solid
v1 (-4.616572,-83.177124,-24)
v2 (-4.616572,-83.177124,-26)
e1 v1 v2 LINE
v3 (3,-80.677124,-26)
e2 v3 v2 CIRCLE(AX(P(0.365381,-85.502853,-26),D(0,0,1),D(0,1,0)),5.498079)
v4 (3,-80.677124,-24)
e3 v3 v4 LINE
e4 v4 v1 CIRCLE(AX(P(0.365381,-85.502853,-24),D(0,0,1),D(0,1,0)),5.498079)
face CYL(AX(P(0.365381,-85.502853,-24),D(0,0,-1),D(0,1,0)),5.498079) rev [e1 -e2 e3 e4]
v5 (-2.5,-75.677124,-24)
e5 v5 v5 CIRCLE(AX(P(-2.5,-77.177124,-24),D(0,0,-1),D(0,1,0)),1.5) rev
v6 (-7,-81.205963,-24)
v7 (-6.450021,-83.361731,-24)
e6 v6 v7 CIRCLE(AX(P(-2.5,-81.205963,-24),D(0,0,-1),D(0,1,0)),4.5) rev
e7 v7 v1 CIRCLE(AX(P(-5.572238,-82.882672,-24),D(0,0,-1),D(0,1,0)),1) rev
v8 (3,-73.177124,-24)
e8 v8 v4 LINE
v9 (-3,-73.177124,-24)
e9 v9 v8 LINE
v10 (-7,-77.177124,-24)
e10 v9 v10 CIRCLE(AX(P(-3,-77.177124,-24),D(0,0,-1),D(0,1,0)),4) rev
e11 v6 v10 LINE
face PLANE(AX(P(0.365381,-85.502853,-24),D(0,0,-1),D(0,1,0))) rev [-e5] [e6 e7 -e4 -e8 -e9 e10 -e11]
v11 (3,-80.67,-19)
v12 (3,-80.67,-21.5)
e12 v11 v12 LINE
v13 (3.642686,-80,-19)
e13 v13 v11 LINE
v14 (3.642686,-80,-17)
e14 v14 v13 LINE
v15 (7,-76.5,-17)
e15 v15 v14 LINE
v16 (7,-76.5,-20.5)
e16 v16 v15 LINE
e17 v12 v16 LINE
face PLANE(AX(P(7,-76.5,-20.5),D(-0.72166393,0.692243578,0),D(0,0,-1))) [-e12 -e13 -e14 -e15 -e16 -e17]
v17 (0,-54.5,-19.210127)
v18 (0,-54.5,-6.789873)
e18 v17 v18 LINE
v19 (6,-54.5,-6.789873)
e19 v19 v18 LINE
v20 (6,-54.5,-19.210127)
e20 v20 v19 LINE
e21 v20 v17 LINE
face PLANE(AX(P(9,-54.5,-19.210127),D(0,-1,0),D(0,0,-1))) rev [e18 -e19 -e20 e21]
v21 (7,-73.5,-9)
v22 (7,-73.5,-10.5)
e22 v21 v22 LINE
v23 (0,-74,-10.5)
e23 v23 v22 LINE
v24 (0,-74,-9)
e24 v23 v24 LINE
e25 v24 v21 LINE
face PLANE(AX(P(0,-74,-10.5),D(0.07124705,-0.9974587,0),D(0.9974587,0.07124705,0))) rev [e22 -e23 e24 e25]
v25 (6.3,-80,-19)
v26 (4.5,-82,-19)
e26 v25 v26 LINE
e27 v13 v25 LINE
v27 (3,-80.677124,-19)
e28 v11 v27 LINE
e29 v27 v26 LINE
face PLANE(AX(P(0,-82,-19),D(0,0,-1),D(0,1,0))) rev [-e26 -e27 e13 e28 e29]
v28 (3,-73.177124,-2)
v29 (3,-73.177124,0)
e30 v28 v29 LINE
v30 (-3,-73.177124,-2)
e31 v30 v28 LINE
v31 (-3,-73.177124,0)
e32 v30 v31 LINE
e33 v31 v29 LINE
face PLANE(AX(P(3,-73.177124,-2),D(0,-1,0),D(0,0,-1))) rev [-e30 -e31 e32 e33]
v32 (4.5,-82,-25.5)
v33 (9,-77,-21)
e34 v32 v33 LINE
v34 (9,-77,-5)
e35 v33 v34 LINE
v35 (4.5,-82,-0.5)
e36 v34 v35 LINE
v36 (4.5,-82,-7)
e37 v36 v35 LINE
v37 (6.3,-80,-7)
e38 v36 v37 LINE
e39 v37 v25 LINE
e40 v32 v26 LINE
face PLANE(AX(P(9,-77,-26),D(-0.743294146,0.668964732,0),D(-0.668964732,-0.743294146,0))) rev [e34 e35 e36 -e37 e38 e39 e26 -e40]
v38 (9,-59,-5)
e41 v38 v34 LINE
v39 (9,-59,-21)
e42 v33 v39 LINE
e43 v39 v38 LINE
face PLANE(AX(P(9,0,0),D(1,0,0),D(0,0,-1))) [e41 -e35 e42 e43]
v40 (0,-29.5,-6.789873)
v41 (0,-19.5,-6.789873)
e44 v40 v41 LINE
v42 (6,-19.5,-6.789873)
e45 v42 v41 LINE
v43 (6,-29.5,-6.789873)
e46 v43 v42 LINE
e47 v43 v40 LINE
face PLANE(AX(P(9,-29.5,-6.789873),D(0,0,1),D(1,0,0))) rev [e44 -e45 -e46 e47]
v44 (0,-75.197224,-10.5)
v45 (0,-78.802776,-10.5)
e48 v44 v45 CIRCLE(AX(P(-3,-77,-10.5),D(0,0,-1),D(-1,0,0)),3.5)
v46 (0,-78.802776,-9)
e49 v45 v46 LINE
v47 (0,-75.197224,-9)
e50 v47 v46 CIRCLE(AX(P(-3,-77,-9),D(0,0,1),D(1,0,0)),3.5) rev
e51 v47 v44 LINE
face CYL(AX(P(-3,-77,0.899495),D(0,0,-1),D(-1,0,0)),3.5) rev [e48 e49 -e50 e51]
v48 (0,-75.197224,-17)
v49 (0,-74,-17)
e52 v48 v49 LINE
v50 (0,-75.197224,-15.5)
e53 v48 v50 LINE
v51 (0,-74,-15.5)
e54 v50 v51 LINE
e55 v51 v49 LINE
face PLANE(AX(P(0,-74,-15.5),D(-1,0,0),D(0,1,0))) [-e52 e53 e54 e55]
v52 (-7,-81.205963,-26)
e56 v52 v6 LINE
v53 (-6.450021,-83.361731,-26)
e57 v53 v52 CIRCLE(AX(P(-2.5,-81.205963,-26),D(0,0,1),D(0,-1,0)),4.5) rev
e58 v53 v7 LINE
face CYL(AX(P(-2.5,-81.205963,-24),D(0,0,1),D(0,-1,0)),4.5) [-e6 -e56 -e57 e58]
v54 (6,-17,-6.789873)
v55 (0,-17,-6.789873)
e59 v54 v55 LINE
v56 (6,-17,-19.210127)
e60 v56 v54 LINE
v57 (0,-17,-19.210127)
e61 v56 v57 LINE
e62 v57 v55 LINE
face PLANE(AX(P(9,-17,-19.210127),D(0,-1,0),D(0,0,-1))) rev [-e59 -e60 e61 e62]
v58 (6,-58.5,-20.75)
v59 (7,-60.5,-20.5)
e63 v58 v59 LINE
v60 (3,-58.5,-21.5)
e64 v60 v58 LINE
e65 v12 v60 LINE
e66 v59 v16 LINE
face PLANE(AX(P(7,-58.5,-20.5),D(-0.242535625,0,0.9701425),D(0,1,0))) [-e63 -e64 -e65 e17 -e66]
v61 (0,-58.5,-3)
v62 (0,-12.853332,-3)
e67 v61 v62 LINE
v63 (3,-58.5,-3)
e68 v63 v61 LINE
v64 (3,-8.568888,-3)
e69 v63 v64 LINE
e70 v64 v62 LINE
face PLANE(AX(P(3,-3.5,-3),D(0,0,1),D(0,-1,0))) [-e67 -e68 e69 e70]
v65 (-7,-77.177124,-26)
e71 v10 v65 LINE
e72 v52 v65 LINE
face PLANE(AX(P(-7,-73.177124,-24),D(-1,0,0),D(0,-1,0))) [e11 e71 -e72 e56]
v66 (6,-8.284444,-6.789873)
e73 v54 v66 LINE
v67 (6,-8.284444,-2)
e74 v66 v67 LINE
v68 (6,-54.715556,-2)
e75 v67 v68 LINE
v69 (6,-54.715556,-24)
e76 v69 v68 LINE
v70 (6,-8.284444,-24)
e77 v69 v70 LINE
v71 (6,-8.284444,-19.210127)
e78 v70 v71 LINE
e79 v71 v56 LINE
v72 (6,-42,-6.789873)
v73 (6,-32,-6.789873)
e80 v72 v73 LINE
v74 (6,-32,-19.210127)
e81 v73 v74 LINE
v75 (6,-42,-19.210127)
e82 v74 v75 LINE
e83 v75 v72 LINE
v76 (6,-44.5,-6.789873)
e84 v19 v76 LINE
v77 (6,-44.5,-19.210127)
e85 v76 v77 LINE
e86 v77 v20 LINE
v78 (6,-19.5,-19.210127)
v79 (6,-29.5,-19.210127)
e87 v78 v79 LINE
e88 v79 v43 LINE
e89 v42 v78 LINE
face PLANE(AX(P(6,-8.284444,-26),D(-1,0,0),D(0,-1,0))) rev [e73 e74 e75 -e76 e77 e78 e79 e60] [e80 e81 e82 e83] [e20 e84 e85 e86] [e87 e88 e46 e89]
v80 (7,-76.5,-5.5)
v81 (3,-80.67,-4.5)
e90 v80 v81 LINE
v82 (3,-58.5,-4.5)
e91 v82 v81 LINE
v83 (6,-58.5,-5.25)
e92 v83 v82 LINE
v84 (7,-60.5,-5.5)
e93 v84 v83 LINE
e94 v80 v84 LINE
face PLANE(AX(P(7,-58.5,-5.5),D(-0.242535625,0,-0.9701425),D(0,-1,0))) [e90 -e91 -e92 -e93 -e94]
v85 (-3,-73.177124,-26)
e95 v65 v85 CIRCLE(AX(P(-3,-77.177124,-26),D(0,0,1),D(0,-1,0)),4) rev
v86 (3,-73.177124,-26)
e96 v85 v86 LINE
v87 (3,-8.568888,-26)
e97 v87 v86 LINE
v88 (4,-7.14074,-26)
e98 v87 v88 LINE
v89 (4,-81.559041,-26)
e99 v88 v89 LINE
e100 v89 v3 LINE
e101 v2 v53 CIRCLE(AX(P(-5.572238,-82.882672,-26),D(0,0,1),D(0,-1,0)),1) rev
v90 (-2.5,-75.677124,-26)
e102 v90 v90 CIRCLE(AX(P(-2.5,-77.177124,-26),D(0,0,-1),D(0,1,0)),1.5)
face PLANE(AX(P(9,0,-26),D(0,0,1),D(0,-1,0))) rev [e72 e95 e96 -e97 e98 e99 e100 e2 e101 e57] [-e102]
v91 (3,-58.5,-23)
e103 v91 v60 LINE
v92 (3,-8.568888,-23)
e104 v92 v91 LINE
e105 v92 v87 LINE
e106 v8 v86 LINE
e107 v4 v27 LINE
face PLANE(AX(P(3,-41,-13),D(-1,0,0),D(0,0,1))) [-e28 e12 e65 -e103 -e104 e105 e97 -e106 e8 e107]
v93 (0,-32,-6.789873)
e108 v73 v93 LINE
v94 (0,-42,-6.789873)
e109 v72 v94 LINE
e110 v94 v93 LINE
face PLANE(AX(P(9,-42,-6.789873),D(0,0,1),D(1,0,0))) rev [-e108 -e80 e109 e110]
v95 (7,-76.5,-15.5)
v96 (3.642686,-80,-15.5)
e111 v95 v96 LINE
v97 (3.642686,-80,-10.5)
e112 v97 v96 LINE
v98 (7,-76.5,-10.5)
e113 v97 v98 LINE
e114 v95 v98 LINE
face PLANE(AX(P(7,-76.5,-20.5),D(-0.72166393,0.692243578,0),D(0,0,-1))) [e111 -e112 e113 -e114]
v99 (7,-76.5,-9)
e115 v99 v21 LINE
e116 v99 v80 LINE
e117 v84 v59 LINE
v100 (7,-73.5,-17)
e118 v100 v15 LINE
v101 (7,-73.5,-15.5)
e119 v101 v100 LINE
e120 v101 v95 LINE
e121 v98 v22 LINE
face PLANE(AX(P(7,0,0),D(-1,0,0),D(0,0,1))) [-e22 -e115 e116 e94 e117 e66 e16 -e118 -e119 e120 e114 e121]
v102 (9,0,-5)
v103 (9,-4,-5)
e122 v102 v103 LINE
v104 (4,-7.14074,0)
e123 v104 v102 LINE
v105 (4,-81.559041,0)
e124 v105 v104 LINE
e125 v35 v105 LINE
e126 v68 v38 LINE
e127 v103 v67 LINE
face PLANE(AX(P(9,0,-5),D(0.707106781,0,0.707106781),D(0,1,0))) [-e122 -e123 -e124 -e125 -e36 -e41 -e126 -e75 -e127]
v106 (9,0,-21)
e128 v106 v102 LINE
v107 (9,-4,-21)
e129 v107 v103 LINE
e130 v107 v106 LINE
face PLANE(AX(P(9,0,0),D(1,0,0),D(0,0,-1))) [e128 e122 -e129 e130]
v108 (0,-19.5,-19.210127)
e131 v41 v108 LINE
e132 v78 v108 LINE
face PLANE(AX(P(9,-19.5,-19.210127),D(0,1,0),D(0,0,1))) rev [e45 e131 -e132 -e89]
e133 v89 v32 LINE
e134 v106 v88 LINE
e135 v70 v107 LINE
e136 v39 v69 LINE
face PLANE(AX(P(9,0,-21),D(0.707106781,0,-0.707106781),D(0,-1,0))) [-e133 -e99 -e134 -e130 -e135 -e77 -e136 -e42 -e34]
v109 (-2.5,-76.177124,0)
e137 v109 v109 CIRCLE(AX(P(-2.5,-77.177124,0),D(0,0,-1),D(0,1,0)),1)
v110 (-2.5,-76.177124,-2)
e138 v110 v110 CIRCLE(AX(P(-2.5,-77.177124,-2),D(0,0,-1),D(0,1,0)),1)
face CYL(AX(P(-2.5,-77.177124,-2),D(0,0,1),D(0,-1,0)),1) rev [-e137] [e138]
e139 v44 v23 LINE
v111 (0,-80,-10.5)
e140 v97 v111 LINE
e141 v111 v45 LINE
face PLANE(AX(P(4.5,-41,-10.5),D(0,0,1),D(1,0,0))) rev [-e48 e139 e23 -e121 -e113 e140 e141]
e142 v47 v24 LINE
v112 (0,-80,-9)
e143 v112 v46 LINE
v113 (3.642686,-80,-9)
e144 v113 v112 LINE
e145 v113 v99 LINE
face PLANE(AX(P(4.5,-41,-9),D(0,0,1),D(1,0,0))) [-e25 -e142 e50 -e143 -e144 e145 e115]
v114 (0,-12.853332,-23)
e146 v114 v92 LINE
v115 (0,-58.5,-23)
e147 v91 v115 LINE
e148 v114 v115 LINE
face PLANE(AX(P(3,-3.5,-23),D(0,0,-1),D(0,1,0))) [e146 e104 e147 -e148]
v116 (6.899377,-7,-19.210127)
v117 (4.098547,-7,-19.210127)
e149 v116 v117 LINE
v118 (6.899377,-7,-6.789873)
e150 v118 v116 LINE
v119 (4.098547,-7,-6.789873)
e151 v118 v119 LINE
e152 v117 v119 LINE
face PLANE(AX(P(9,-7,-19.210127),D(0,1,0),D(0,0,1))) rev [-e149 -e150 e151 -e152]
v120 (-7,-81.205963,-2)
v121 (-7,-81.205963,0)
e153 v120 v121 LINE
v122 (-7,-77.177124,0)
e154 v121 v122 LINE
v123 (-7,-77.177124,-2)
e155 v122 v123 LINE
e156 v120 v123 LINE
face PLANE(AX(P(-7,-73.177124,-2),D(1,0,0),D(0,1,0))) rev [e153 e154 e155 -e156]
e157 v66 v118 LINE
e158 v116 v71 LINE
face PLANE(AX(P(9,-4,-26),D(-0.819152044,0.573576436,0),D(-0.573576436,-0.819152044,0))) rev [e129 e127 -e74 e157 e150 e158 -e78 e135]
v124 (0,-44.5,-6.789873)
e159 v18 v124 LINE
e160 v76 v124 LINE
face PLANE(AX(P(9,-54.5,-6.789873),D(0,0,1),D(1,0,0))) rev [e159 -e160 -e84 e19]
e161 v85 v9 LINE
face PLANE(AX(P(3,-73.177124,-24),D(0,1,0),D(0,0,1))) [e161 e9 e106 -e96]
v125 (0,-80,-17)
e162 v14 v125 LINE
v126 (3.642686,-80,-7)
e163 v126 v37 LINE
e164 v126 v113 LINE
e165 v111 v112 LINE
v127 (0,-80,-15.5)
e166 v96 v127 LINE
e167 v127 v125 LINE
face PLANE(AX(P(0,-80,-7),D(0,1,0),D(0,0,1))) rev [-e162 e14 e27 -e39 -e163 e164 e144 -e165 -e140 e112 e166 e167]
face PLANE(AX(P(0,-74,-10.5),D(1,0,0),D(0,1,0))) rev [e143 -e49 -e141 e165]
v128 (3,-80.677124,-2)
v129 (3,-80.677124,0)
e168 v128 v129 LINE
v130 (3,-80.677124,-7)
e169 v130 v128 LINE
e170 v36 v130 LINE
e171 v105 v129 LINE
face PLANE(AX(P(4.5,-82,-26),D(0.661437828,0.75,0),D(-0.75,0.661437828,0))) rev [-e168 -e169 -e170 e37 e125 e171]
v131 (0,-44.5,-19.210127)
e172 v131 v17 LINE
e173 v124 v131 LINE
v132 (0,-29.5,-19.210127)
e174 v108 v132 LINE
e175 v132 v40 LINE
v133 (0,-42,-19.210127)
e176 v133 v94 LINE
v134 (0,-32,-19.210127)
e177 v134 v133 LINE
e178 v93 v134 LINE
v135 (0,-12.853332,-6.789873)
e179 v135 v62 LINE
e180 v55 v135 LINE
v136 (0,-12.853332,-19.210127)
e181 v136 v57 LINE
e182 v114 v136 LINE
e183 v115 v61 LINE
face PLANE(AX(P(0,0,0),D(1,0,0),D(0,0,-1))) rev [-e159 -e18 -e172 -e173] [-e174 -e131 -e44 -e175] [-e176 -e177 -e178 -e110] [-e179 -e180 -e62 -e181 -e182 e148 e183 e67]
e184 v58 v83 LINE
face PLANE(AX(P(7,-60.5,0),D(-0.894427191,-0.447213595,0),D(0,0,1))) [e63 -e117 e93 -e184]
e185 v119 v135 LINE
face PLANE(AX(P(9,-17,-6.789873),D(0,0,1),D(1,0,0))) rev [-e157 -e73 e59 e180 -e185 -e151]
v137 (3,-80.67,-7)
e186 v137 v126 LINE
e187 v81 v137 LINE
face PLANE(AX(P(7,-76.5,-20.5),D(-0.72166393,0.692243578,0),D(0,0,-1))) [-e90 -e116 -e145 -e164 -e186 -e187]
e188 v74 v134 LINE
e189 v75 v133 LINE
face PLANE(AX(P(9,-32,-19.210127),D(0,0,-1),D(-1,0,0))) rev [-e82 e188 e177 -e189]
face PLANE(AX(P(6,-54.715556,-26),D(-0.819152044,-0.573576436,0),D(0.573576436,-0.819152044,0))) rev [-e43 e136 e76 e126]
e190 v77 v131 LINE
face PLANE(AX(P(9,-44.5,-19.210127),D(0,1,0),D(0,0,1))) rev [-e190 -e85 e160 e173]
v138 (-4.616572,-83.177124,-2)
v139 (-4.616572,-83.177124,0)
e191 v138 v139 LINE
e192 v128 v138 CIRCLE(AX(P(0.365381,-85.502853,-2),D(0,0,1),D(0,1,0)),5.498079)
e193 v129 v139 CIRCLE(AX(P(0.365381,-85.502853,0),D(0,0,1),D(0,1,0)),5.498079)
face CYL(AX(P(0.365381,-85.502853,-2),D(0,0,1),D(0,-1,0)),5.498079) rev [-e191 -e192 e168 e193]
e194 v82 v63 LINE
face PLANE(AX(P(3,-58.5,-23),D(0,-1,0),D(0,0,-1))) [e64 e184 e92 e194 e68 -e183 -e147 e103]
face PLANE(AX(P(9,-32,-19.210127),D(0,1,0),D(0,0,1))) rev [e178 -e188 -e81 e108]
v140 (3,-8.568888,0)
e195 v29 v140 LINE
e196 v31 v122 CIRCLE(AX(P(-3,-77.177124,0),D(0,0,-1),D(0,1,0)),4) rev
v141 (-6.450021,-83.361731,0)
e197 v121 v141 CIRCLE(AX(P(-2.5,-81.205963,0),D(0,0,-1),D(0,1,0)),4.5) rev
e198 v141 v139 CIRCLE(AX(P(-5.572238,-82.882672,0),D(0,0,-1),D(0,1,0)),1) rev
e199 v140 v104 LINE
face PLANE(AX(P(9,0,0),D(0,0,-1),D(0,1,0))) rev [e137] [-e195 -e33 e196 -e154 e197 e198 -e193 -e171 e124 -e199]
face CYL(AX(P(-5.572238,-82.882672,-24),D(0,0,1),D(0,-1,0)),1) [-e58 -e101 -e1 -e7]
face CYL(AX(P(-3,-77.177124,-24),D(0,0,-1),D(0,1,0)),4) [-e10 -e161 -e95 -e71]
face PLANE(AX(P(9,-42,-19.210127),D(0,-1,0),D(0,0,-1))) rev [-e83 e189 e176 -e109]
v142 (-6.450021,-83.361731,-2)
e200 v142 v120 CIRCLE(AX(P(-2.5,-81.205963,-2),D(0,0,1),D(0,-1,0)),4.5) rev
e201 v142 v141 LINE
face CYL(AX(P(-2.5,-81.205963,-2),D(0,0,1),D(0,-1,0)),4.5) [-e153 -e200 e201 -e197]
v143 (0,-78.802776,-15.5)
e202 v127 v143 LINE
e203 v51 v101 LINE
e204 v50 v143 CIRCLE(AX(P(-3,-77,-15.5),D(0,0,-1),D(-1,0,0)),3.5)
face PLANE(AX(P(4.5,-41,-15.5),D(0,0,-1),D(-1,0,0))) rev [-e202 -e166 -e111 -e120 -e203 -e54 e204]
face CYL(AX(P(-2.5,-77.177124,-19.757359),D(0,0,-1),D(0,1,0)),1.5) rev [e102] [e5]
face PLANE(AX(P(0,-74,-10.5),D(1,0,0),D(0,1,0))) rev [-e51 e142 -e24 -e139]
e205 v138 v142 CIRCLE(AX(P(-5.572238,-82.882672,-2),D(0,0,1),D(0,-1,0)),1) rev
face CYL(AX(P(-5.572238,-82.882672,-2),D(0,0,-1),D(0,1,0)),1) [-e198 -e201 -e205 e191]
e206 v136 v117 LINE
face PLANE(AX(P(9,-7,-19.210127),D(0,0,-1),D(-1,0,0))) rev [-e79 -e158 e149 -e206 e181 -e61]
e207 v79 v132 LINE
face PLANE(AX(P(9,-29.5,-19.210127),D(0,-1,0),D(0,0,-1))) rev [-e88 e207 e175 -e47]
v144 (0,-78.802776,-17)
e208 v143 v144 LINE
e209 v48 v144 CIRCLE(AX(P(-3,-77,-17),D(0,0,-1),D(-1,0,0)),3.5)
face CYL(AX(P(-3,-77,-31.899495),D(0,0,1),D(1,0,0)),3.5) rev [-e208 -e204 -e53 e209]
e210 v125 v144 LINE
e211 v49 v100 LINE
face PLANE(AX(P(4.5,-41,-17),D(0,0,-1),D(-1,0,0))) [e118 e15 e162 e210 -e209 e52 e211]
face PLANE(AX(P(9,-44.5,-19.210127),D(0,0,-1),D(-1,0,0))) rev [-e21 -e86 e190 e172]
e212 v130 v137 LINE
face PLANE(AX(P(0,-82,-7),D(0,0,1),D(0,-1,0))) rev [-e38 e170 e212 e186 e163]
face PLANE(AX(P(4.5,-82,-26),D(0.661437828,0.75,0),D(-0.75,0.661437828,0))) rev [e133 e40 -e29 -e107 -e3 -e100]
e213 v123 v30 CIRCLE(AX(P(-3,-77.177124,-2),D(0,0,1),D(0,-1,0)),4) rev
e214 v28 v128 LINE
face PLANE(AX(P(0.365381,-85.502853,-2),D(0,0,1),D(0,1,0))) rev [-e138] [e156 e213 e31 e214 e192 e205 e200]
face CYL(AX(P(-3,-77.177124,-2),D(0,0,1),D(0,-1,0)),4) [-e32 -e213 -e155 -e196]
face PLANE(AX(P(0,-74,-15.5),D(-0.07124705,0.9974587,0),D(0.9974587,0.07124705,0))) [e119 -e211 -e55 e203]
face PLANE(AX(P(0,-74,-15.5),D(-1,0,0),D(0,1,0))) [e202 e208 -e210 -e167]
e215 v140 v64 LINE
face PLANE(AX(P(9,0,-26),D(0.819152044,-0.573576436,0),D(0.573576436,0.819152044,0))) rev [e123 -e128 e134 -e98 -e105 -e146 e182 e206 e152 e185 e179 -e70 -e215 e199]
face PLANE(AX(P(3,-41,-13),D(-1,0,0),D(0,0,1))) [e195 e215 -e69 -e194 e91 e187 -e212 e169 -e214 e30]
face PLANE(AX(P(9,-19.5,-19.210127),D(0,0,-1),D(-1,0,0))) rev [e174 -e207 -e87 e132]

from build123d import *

# Parameters (mm, degrees)
SKETCH_1_W             = 26
SKETCH_1_H             = 82
EXTRUDE_1_DEPTH        = 9
CHAMFER_1_SIZE         = 5
CUT_EXTRUDE_1_DEPTH    = 87.492774265
SKETCH_3_OUTSIDE_W     = 45.298
SKETCH_3_OUTSIDE_H     = 101.298
SKETCH_3_OUTSIDE_W_2   = 20
SKETCH_3_OUTSIDE_H_2   = 55
CUT_EXTRUDE_2_DEPTH    = 3
SKETCH_4_W             = 12.420254628
SKETCH_4_H             = 10
CUT_EXTRUDE_3_DEPTH    = 87.492774265
PATTERN_LINEAR_1_COUNT = 4
PATTERN_LINEAR_1_PITCH = 12.5
CUT_EXTRUDE_4_DEPTH    = 87.492774265
SKETCH_6_W             = 12
SKETCH_6_H             = 2
CUT_EXTRUDE_5_DEPTH    = 87.492774265
SKETCH_7_W             = 15
SKETCH_7_H             = 18
CUT_EXTRUDE_6_DEPTH    = 4
CUT_EXTRUDE_7_DEPTH    = 87.492774265
CHAMFER_2_SIZE         = 1
CHAMFER_2_SIZE2        = 2
CHAMFER_3_SIZE2        = 1
CHAMFER_3_SIZE         = 4
CHAMFER_4_SIZE2        = 4
CHAMFER_4_SIZE         = 1
CHAMFER_5_SIZE         = 4.17
CHAMFER_5_SIZE_2       = 4
RIB_1_DEPTH            = 1.5
SKETCH_10_R            = 3.5
CUT_EXTRUDE_8_DEPTH    = 1.5
EXTRUDE_2_DEPTH        = 2
FILLET_1_R             = 4
FILLET_2_R             = 4.5
SKETCH_12_R            = 1
CUT_EXTRUDE_9_DEPTH    = 2
FILLET_1_OF_MIRROR_2_R = 4
FILLET_2_OF_MIRROR_2_R = 4.5
FILLET_3_R             = 1
SKETCH_13_R            = 1.5
CUT_EXTRUDE_11_DEPTH   = 2


# Read off the part's stored shape, not the designer's step: 筋1
# Some blends are built 0.0001 mm under size
with BuildPart() as part:
    # 草图1 → 凸台-拉伸1 (new body)
    with BuildSketch(Plane(origin=(0, 0, 0), x_dir=(0, 0, -1), z_dir=(1, 0, 0))):
        with Locations((13, -41)):
            Rectangle(SKETCH_1_W, SKETCH_1_H)
    extrude(amount=EXTRUDE_1_DEPTH)

    # 倒角1
    chamfer_1_edges = [part.edges().sort_by_distance(p)[0] for p in [
        (9, -41, -26),
        (9, -41, 0),
    ]]
    chamfer(chamfer_1_edges, length=CHAMFER_1_SIZE)

    # 草图2 → 切除-拉伸1 (cut, through all)
    with BuildSketch(Plane.XY):
        Polygon((9, 0), (0, -12.853332061), (0, 0), align=None)
        Polygon((9, -4), (6, -8.28444402), (6, -54.71555598), (9, -59), align=None)
    extrude(amount=-CUT_EXTRUDE_1_DEPTH, mode=Mode.SUBTRACT)

    # 草图3 outside → 切除-拉伸2 (cut)
    with BuildSketch(Plane.ZY):
        with Locations((-13, -41)):
            Rectangle(SKETCH_3_OUTSIDE_W, SKETCH_3_OUTSIDE_H)
        with Locations((-13, -31)):
            Rectangle(SKETCH_3_OUTSIDE_W_2, SKETCH_3_OUTSIDE_H_2, mode=Mode.SUBTRACT)
    extrude(amount=-CUT_EXTRUDE_2_DEPTH, mode=Mode.SUBTRACT)

    # 草图4 → 切除-拉伸3 (cut, through all)
    with BuildSketch(Plane.ZY):
        with Locations((-13, -12)):
            Rectangle(SKETCH_4_W, SKETCH_4_H)
    cut_extrude_3 = extrude(amount=-CUT_EXTRUDE_3_DEPTH, mode=Mode.SUBTRACT)

    # 阵列(线性)1: 切除-拉伸3 ×4
    with Locations(*[(0, -i * PATTERN_LINEAR_1_PITCH, 0) for i in range(1, PATTERN_LINEAR_1_COUNT)]):
        add(cut_extrude_3, mode=Mode.SUBTRACT)

    # 草图5 → 切除-拉伸4 (cut, through all)
    with BuildSketch(Plane.XY):
        Polygon((9, -77), (9, -82), (4.5, -82), align=None)
    extrude(amount=-CUT_EXTRUDE_4_DEPTH, mode=Mode.SUBTRACT)

    # 草图6 → 切除-拉伸5 (cut, through all)
    with BuildSketch(Plane(origin=(9, 0, 0), x_dir=(0, 0, -1), z_dir=(1, 0, 0))):
        with Locations((13, -81)):
            Rectangle(SKETCH_6_W, SKETCH_6_H)
    extrude(amount=-CUT_EXTRUDE_5_DEPTH, mode=Mode.SUBTRACT)

    # 草图7 → 切除-拉伸6 (cut)
    with BuildSketch(Plane.ZY.offset(-3)):
        with Locations((-13, -67.5)):
            Rectangle(SKETCH_7_W, SKETCH_7_H)
    extrude(amount=-CUT_EXTRUDE_6_DEPTH, mode=Mode.SUBTRACT)

    # 草图8 → 切除-拉伸7 (cut, through all)
    with BuildSketch(Plane.XY):
        Polygon((4.5, -82), (3, -80.677124344), (3, -82), align=None)
    extrude(amount=-CUT_EXTRUDE_7_DEPTH, mode=Mode.SUBTRACT)

    # 倒角2
    chamfer_2_edges = [part.edges().sort_by_distance(p)[0] for p in [
        (7, -58.5, -13),
    ]]
    chamfer_2_side = [part.faces().sort_by_distance(p)[0] for p in [
        (3.25, -58.5, -13),
    ]]
    chamfer(chamfer_2_edges, length=CHAMFER_2_SIZE, length2=CHAMFER_2_SIZE2, reference=chamfer_2_side[0])

    # 倒角3
    chamfer_3_edges = [part.edges().sort_by_distance(p)[0] for p in [
        (3, -67.5, -5.5),
    ]]
    chamfer_3_side = [part.faces().sort_by_distance(p)[0] for p in [
        (3.02, -67.5, -5.5),
    ]]
    chamfer(chamfer_3_edges, length=CHAMFER_3_SIZE - 0.0001, length2=CHAMFER_3_SIZE2 - 0.0001, reference=chamfer_3_side[0])  # a hair under: the kernel refuses the full size

    # 倒角4
    chamfer_4_edges = [part.edges().sort_by_distance(p)[0] for p in [
        (3, -67.5, -20.5),
    ]]
    chamfer_4_side = [part.faces().sort_by_distance(p)[0] for p in [
        (3, -67.5, -20.52),
    ]]
    chamfer(chamfer_4_edges, length=CHAMFER_4_SIZE - 0.0001, length2=CHAMFER_4_SIZE2 - 0.0001, reference=chamfer_4_side[0])  # a hair under: the kernel refuses the full size

    # 倒角5
    # the kernel refuses this chamfer: 4.17, 4 mm, written as the material it takes off along each edge
    with BuildSketch(Plane(origin=(3, -76.5, 6.229717564), x_dir=(-0.026903120245147794, -0.9996380455550276, 0), z_dir=(0, 0, -1))) as chamfer_5_piece_1_section:
        Polygon((CHAMFER_5_SIZE * 0.999638045555, -CHAMFER_5_SIZE * 0.0269031202451), (-CHAMFER_5_SIZE_2 * 0.0269031202451, -CHAMFER_5_SIZE_2 * 0.999638045555), (0, 0), align=None)
    chamfer_5_piece_1 = extrude(amount=38.459435128, mode=Mode.PRIVATE)
    chamfer_5_piece_1 = split(chamfer_5_piece_1, bisect_by=Plane(origin=(3.319672902, -80.226492904, -4.580012231), z_dir=(-0.24251850433325217, 0, -0.9701467801605912)), keep=Keep.TOP, mode=Mode.PRIVATE)
    chamfer_5_piece_1 = split(chamfer_5_piece_1, bisect_by=Plane(origin=(7.071862718, -80.226492904, -20.48201067), z_dir=(-0.24251850433325217, 0, 0.9701467801605912)), keep=Keep.TOP, mode=Mode.PRIVATE)
    add(chamfer_5_piece_1, mode=Mode.SUBTRACT)

    # 筋1 outline → 筋1 (add)
    with BuildSketch(Plane.XY.offset(-10.5)):
        Polygon((0, -74), (0, -80), (3.642685851, -80), (7, -76.5), (7, -73.5), align=None)
    rib_1 = extrude(amount=RIB_1_DEPTH)

    # 草图10 → 切除-拉伸8 (cut)
    with BuildSketch(Plane(origin=(0, 0, -10.5), x_dir=(-1, 0, 0), z_dir=(0, 0, -1))):
        with Locations((3, -77)):
            Circle(SKETCH_10_R)
    cut_extrude_8 = extrude(amount=-CUT_EXTRUDE_8_DEPTH, mode=Mode.SUBTRACT)

    # 镜向1: 筋1, 切除-拉伸8 across plane
    add(rib_1.mirror(Plane.XY.offset(-13)))
    add(cut_extrude_8.mirror(Plane.XY.offset(-13)), mode=Mode.SUBTRACT)

    # 草图11 → 凸台-拉伸2 (add)
    with BuildSketch(Plane(origin=(0, 0, -26), x_dir=(-1, 0, 0), z_dir=(0, 0, -1))):
        with BuildLine():
            Line((-3, -80.677124344), (-3, -73.177124344))
            Line((-3, -73.177124344), (7, -73.177124344))
            Line((7, -73.177124344), (7, -85.177124344))
            Line((7, -85.177124344), (4.616572218, -85.177124344))
            Line((4.616572218, -85.177124344), (4.616572218, -83.177124344))
            ThreePointArc((4.616572218, -83.177124344), (1.349260187, -80.278977091), (-3, -80.677124344))
        make_face()
    extrude_2 = extrude(amount=-EXTRUDE_2_DEPTH)

    # 圆角1
    fillet_1_edges = [part.edges().sort_by_distance(p)[0] for p in [
        (-7, -73.177124344, -25),
    ]]
    fillet(fillet_1_edges, radius=FILLET_1_R)

    # 圆角2
    # the kernel refuses this fillet: 4.5 mm, written as the material it takes off along each edge
    with BuildSketch(Plane(origin=(-7, -85.177124344, -35.927903243), x_dir=(0, 1, 0), z_dir=(0, 0, 1))) as fillet_2_piece_1:
        with BuildLine():
            CenterArc((3.971161297, -4.5), FILLET_2_R, 90, 61.943021953)
            Line((0, -2.383427782), (-0.079423226, -2.341096338))
            ThreePointArc((-0.079423226, -2.341096338), (-0.09, -1.191713891), (-0.09, 0))
            Line((-0.09, 0), (0, 0.09))
            Line((0, 0.09), (3.971161297, 0.09))
            Line((3.971161297, 0.09), (3.971161297, 0))
        make_face()
    extrude(amount=21.855806485, mode=Mode.SUBTRACT)

    # 草图12 → 切除-拉伸9 (cut)
    with BuildSketch(Plane(origin=(0, 0, -26), x_dir=(-1, 0, 0), z_dir=(0, 0, -1))):
        with Locations(Location((2.5, -77.177124344, 0), (0, 0, 90))):
            Circle(SKETCH_12_R)
    cut_extrude_9 = extrude(amount=-CUT_EXTRUDE_9_DEPTH, mode=Mode.SUBTRACT)

    # 镜向2: 凸台-拉伸2, 切除-拉伸9 across plane
    add(extrude_2.mirror(Plane.XY.offset(-13)))
    add(cut_extrude_9.mirror(Plane.XY.offset(-13)), mode=Mode.SUBTRACT)

    # 圆角1 of 镜向2
    fillet_1_of_mirror_2_edges = [part.edges().sort_by_distance(p)[0] for p in [
        (-7, -73.177124344, -1),
    ]]
    fillet(fillet_1_of_mirror_2_edges, radius=FILLET_1_OF_MIRROR_2_R)

    # 圆角2 of 镜向2
    # the kernel refuses this fillet: 4.5 mm, written as the material it takes off along each edge
    with BuildSketch(Plane(origin=(-7, -85.177124344, 9.927903243), x_dir=(0, 1, 0), z_dir=(0, 0, -1))) as fillet_2_of_mirror_2_piece_1:
        with BuildLine():
            CenterArc((3.971161297, 4.5), FILLET_2_OF_MIRROR_2_R, 208.056978047, 61.943021953)
            Line((0, 2.383427782), (-0.079423226, 2.341096338))
            ThreePointArc((-0.079423226, 2.341096338), (-0.09, 1.191713891), (-0.09, 0))
            Line((-0.09, 0), (0, -0.09))
            Line((0, -0.09), (3.971161297, -0.09))
            Line((3.971161297, -0.09), (3.971161297, 0))
        make_face()
    extrude(amount=21.855806485, mode=Mode.SUBTRACT)

    # 圆角3
    # the kernel refuses this fillet: 1 mm, written as the material it takes off along each edge
    with BuildSketch(Plane(origin=(-4.616572218, -85.177124344, -32.450380338), x_dir=(-0.7105970280063522, 0.7035992209976782, 0), z_dir=(0, 0, 1))) as fillet_3_piece_1:
        with BuildLine():
            CenterArc((2.293468564, -0.958025329), FILLET_3_R, 73.340489996, 134.251279475)
            Line((1.407198442, -1.421194056), (1.38947304, -1.430457431))
            ThreePointArc((1.38947304, -1.430457431), (0.68938728, -0.724669012), (-0.014211941, -0.014071984))
            Line((-0.014211941, -0.014071984), (-0.005733671, 0.019160507))
            ThreePointArc((-0.005733671, 0.019160507), (1.290076068, 0.208886021), (2.585885806, 0.019160507))
            Line((2.585885806, 0.019160507), (2.580152135, 0))
        make_face()
    extrude(amount=14.900760675, mode=Mode.SUBTRACT)
    with BuildSketch(Plane(origin=(-4.616572218, -85.177124344, 6.450380338), x_dir=(0, 1, 0), z_dir=(0, 0, -1))) as fillet_3_piece_2:
        with BuildLine():
            CenterArc((2.294452647, -0.955666071), FILLET_3_R, 107.12471858, 134.251279475)
            Line((1.815393032, -1.833448439), (1.80581184, -1.851004086))
            ThreePointArc((1.80581184, -1.851004086), (0.75926273, -1.063696261), (-0.017649606, -0.009406988))
            Line((-0.017649606, -0.009406988), (0, 0.02))
            ThreePointArc((0, 0.02), (1, 0.02), (1.994110947, 0.019113321))
            Line((1.994110947, 0.019113321), (2, 0))
        make_face()
    extrude(amount=14.900760675, mode=Mode.SUBTRACT)

    # 草图13 → 切除-拉伸11 (cut)
    with BuildSketch(Plane(origin=(0, 0, -26), x_dir=(-1, 0, 0), z_dir=(0, 0, -1))):
        with Locations(Location((2.5, -77.177124344, 0), (0, 0, 90))):
            Circle(SKETCH_13_R)
    extrude(amount=-CUT_EXTRUDE_11_DEPTH, mode=Mode.SUBTRACT)


solid = part.part
